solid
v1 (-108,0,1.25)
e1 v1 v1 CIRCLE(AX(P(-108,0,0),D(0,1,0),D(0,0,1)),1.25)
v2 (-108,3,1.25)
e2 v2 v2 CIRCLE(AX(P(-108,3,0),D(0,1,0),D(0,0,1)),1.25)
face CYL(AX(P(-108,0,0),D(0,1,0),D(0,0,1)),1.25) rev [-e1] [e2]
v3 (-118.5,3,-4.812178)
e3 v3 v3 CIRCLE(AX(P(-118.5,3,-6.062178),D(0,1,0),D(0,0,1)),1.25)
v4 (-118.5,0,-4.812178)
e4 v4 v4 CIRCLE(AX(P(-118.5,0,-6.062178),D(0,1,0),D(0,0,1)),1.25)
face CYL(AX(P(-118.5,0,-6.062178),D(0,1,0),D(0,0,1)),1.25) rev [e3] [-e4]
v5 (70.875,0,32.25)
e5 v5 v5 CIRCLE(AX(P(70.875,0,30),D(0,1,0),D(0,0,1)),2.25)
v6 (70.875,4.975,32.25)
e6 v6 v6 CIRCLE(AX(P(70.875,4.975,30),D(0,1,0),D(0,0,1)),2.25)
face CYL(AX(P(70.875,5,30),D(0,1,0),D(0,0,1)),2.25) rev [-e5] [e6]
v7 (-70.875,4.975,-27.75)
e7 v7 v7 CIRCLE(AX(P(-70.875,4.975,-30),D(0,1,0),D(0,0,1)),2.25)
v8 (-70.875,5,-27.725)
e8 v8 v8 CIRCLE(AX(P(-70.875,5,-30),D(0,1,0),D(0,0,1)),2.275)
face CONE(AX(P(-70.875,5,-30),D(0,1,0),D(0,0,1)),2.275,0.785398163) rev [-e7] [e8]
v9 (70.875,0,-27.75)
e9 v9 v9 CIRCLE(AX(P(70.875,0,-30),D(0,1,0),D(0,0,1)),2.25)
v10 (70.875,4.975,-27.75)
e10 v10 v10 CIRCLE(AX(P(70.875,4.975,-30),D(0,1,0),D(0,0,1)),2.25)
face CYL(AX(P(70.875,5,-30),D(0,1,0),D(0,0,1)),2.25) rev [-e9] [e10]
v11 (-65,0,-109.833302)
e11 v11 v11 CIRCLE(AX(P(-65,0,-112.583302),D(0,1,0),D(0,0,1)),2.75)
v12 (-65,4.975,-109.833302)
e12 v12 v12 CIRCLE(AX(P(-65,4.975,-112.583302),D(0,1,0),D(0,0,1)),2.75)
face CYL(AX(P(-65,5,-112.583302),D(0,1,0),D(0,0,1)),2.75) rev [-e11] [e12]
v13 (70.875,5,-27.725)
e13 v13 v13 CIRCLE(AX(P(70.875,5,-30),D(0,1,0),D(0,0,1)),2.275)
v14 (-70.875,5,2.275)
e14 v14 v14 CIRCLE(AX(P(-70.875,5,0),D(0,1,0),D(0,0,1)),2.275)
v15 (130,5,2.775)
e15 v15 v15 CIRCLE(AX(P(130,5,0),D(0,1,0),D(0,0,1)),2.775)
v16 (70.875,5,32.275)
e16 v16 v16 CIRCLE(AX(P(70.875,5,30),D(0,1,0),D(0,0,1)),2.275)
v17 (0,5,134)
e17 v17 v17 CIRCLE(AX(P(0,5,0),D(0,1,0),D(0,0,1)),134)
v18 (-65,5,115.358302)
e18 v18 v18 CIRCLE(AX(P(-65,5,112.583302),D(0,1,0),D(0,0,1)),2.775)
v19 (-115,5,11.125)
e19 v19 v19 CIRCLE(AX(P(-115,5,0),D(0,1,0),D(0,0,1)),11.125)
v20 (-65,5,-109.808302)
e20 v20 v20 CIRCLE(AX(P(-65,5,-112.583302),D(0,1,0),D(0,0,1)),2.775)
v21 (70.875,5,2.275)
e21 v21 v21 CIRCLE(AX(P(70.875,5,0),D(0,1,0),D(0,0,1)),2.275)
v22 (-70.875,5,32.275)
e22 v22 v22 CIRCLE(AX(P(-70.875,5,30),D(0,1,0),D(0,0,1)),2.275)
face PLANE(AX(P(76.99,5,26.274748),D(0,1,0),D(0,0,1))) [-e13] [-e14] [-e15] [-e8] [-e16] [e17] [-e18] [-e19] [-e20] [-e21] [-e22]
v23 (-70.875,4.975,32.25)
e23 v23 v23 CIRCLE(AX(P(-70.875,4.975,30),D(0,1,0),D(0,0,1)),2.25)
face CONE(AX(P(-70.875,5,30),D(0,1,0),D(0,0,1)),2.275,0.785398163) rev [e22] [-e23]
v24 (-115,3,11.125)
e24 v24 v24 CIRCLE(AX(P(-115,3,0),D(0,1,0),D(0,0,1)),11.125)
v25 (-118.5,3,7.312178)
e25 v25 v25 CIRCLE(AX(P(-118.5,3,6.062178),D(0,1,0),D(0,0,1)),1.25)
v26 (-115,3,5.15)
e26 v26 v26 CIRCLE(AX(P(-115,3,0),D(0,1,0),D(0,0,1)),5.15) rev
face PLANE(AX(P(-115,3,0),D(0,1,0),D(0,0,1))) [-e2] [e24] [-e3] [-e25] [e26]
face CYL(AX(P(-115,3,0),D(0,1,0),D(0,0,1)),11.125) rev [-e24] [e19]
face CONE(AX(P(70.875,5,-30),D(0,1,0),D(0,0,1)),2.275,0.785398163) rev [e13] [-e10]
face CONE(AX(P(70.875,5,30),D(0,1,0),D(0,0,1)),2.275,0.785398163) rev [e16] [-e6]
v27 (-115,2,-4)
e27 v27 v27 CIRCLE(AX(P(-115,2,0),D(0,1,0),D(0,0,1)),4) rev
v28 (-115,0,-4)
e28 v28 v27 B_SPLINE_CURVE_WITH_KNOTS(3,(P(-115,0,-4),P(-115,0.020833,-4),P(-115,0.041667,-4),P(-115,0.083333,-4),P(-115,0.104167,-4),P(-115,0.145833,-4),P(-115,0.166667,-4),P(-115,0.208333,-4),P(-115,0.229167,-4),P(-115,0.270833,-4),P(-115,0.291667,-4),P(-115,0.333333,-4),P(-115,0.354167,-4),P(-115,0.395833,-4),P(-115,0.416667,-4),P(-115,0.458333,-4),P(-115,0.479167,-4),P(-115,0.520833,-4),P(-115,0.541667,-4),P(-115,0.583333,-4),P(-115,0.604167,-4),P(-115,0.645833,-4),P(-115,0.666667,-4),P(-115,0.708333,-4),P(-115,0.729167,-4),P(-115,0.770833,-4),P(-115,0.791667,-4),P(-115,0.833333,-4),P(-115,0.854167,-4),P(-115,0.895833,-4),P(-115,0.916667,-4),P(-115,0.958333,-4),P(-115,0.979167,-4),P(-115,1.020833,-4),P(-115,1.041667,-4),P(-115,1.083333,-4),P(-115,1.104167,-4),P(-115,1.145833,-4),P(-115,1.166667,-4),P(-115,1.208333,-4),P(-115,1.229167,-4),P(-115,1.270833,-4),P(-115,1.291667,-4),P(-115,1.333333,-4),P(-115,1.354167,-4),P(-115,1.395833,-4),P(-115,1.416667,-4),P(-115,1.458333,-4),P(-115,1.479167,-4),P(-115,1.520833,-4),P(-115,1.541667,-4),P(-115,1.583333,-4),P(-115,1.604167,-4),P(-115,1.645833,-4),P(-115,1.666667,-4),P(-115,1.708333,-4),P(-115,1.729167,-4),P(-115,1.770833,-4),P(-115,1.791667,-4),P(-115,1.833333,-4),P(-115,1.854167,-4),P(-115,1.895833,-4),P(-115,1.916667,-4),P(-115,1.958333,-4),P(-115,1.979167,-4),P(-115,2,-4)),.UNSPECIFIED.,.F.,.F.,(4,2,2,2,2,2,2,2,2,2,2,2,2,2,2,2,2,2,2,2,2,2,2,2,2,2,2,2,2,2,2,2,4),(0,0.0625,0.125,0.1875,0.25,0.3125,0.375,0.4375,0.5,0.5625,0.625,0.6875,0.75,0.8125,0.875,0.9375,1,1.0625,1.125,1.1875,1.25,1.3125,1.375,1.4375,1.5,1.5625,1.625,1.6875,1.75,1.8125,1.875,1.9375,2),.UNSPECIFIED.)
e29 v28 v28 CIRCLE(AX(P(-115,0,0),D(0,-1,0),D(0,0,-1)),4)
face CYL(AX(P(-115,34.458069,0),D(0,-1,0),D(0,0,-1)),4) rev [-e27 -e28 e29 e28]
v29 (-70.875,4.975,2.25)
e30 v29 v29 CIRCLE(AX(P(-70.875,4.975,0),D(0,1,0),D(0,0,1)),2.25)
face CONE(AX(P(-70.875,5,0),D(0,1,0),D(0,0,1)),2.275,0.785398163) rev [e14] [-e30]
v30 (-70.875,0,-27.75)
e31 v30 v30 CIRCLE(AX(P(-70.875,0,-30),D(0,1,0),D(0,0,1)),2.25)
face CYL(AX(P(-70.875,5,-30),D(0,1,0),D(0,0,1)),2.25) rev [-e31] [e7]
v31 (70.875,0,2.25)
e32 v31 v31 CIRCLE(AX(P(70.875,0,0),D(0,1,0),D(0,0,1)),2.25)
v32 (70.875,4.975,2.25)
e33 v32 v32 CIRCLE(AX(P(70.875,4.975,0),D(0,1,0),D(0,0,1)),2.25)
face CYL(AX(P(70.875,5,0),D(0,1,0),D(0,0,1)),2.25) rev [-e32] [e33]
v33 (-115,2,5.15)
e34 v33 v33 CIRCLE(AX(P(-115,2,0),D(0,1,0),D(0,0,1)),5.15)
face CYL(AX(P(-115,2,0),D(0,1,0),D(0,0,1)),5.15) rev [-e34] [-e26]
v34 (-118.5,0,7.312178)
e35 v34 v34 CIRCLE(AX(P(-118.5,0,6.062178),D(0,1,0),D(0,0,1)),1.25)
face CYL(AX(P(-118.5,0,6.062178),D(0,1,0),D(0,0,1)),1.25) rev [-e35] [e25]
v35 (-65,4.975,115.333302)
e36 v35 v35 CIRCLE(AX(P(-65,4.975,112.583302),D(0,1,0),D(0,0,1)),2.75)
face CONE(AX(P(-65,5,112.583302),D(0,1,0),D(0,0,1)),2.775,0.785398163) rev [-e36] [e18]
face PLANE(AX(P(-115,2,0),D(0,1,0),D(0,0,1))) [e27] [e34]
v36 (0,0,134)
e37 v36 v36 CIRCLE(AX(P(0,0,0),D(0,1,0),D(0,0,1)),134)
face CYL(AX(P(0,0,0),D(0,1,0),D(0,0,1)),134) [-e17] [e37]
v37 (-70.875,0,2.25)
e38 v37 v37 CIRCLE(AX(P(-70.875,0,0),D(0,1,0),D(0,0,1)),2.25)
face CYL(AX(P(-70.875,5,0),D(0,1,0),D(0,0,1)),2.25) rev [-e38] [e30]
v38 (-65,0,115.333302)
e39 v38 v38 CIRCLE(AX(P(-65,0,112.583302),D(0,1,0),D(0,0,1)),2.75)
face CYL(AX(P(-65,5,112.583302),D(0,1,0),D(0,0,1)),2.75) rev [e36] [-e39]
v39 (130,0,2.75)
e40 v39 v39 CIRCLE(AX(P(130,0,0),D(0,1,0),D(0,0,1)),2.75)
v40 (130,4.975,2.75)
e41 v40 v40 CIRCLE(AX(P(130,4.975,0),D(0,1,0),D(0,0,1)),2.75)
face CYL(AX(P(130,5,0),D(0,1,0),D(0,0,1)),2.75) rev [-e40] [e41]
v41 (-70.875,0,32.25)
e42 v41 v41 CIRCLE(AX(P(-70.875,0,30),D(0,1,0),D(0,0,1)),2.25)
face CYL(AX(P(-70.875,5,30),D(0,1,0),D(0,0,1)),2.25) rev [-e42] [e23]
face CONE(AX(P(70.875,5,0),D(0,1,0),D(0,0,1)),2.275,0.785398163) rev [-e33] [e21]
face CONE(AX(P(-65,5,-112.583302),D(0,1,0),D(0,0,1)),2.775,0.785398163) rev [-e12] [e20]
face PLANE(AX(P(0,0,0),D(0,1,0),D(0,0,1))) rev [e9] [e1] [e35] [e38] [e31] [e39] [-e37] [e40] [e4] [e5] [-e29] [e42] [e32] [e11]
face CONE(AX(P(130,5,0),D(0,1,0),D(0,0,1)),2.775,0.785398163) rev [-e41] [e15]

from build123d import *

# Parameters (mm, degrees)
STOCK_NEW_TRACKER_1_OUTLINE_R  = 10.415
STOCK_NEW_TRACKER_1_DEPTH      = 10
FILLET1_R                      = 12.7
SKETCH6_R                      = 10.4
CUT_EXTRUDE5_DEPTH             = 243.280828936
CUT_EXTRUDE1_START             = -5
CUT_EXTRUDE1_DEPTH             = 5
SKETCH2_R                      = 10.415
SKETCH2_R_2                    = 4
BOSS_EXTRUDE1_DEPTH            = 5
SKETCH3_R                      = 5.15
CUT_EXTRUDE2_DEPTH             = 3
SKETCH4_R                      = 11.125
CUT_EXTRUDE3_DEPTH             = 2
SKETCH5_R                      = 1.25
CUT_EXTRUDE4_DEPTH             = 243.092957495
SKETCH7_R                      = 190
SKETCH7_R_2                    = 134
CUT_EXTRUDE6_DEPTH             = 243.126000399
M5_CLEARANCE_HOLE1_D           = 5.5
M5_CLEARANCE_HOLE1_DEPTH       = 7.5
M5_CLEARANCE_HOLE1_CSINK_D     = 5.55
M5_CLEARANCE_HOLE1_CSINK_ANGLE = 90
M5_CLEARANCE_HOLE1_TIP         = 1.652366702
M4_CLEARANCE_HOLE1_D           = 4.5
M4_CLEARANCE_HOLE1_DEPTH       = 7.5
M4_CLEARANCE_HOLE1_CSINK_D     = 4.55
M4_CLEARANCE_HOLE1_CSINK_ANGLE = 90
M4_CLEARANCE_HOLE1_TIP         = 1.351936393


# Read off the part's stored shape, not the designer's step: Stock-New_Tracker-1
with BuildPart() as part:
    # Stock-New_Tracker-1 outline → Stock-New_Tracker-1 (new body)
    with BuildSketch(Plane(origin=(0, 0, 0), x_dir=(1, 0, 0), z_dir=(0, 1, 0))):
        with BuildLine():
            ThreePointArc((144.666666667, 39.642849993), (-150, 0), (144.666666667, -39.642849993))
            ThreePointArc((144.666666667, -39.642849993), (190, 0), (144.666666667, 39.642849993))
        make_face()
        with Locations((168.805, 0)):
            Circle(STOCK_NEW_TRACKER_1_OUTLINE_R, mode=Mode.SUBTRACT)
    extrude(amount=STOCK_NEW_TRACKER_1_DEPTH)

    # Fillet1
    fillet1_edges = [part.edges().sort_by_distance(p)[0] for p in [
        (144.666666667, 5, 39.642849993),
        (144.666666667, 5, -39.642849993),
    ]]
    fillet(fillet1_edges, radius=FILLET1_R)

    # Sketch6 → Cut-Extrude5 (cut, through all)
    with BuildSketch(Plane.XZ):
        with Locations(Location((-115, 0, 0), (0, 0, 270))):
            Circle(SKETCH6_R)
    extrude(amount=-CUT_EXTRUDE5_DEPTH, mode=Mode.SUBTRACT)

    # Sketch1 → Cut-Extrude1 (cut)
    with BuildSketch(Plane(origin=(0, 10, 0), x_dir=(1, 0, 0), z_dir=(0, 1, 0)).offset(CUT_EXTRUDE1_START)):
        with BuildLine():
            ThreePointArc((153.020872865, -39.885765971), (190, 0), (153.020872865, 39.885765971))
            ThreePointArc((153.020872865, 39.885765971), (146.205916285, 42.506906245), (141.960663798, 48.447599878))
            ThreePointArc((141.960663798, 48.447599878), (-150, 0), (141.960663798, -48.447599878))
            ThreePointArc((141.960663798, -48.447599878), (146.205916285, -42.506906245), (153.020872865, -39.885765971))
        make_face()
    extrude(amount=CUT_EXTRUDE1_DEPTH, mode=Mode.SUBTRACT)

    # Sketch2 → Boss-Extrude1 (add)
    with BuildSketch(Plane.XZ):
        with Locations((-115, 0)):
            Circle(SKETCH2_R)
        with Locations(Location((-115, 0, 0), (0, 0, 270))):
            Circle(SKETCH2_R_2, mode=Mode.SUBTRACT)
    extrude(amount=-BOSS_EXTRUDE1_DEPTH)

    # Sketch3 → Cut-Extrude2 (cut)
    with BuildSketch(Plane(origin=(0, 5, 0), x_dir=(1, 0, 0), z_dir=(0, 1, 0))):
        with Locations(Location((-115, 0, 0), (0, 0, 270))):
            Circle(SKETCH3_R)
    extrude(amount=-CUT_EXTRUDE2_DEPTH, mode=Mode.SUBTRACT)

    # Sketch4 → Cut-Extrude3 (cut)
    with BuildSketch(Plane(origin=(0, 5, 0), x_dir=(1, 0, 0), z_dir=(0, 1, 0))):
        with Locations(Location((-115, 0, 0), (0, 0, 270))):
            Circle(SKETCH4_R)
    extrude(amount=-CUT_EXTRUDE3_DEPTH, mode=Mode.SUBTRACT)

    # Sketch5 → Cut-Extrude4 (cut, through all)
    with BuildSketch(Plane(origin=(0, 3, 0), x_dir=(1, 0, 0), z_dir=(0, 1, 0))):
        with Locations(Location((-118.5, -6.062177826, 0), (0, 0, 270))):
            Circle(SKETCH5_R)
        with Locations(Location((-118.5, 6.062177826, 0), (0, 0, 270))):
            Circle(SKETCH5_R)
        with Locations(Location((-108, 0, 0), (0, 0, 270))):
            Circle(SKETCH5_R)
    extrude(amount=-CUT_EXTRUDE4_DEPTH, mode=Mode.SUBTRACT)

    # Sketch7 → Cut-Extrude6 (cut, through all)
    with BuildSketch(Plane(origin=(0, 5, 0), x_dir=(1, 0, 0), z_dir=(0, 1, 0))):
        Circle(SKETCH7_R)
        with Locations(Location((0, 0, 0), (0, 0, 270))):
            Circle(SKETCH7_R_2, mode=Mode.SUBTRACT)
    extrude(amount=-CUT_EXTRUDE6_DEPTH, mode=Mode.SUBTRACT)

    # M5 Clearance Hole1
    with Locations(Plane(origin=(0, 5, 0), x_dir=(1, 0, 0), z_dir=(0, 1, 0))):
        with Locations((-65, 112.583302492), (130, 0), (-65, -112.583302492)):
            CounterSinkHole(M5_CLEARANCE_HOLE1_D / 2, M5_CLEARANCE_HOLE1_CSINK_D / 2, depth=M5_CLEARANCE_HOLE1_DEPTH, counter_sink_angle=M5_CLEARANCE_HOLE1_CSINK_ANGLE)
            with Locations((0, 0, -(M5_CLEARANCE_HOLE1_DEPTH + M5_CLEARANCE_HOLE1_TIP / 2))):  # 118° drill point
                Cone(0, M5_CLEARANCE_HOLE1_D / 2, M5_CLEARANCE_HOLE1_TIP, mode=Mode.SUBTRACT)

    # M4 Clearance Hole1
    with Locations(Plane(origin=(0, 5, 0), x_dir=(1, 0, 0), z_dir=(0, 1, 0))):
        with Locations((-70.875, -30), (-70.875, 0), (-70.875, 30), (70.875, -30), (70.875, 0), (70.875, 30)):
            CounterSinkHole(M4_CLEARANCE_HOLE1_D / 2, M4_CLEARANCE_HOLE1_CSINK_D / 2, depth=M4_CLEARANCE_HOLE1_DEPTH, counter_sink_angle=M4_CLEARANCE_HOLE1_CSINK_ANGLE)
            with Locations((0, 0, -(M4_CLEARANCE_HOLE1_DEPTH + M4_CLEARANCE_HOLE1_TIP / 2))):  # 118° drill point
                Cone(0, M4_CLEARANCE_HOLE1_D / 2, M4_CLEARANCE_HOLE1_TIP, mode=Mode.SUBTRACT)


solid = part.part
